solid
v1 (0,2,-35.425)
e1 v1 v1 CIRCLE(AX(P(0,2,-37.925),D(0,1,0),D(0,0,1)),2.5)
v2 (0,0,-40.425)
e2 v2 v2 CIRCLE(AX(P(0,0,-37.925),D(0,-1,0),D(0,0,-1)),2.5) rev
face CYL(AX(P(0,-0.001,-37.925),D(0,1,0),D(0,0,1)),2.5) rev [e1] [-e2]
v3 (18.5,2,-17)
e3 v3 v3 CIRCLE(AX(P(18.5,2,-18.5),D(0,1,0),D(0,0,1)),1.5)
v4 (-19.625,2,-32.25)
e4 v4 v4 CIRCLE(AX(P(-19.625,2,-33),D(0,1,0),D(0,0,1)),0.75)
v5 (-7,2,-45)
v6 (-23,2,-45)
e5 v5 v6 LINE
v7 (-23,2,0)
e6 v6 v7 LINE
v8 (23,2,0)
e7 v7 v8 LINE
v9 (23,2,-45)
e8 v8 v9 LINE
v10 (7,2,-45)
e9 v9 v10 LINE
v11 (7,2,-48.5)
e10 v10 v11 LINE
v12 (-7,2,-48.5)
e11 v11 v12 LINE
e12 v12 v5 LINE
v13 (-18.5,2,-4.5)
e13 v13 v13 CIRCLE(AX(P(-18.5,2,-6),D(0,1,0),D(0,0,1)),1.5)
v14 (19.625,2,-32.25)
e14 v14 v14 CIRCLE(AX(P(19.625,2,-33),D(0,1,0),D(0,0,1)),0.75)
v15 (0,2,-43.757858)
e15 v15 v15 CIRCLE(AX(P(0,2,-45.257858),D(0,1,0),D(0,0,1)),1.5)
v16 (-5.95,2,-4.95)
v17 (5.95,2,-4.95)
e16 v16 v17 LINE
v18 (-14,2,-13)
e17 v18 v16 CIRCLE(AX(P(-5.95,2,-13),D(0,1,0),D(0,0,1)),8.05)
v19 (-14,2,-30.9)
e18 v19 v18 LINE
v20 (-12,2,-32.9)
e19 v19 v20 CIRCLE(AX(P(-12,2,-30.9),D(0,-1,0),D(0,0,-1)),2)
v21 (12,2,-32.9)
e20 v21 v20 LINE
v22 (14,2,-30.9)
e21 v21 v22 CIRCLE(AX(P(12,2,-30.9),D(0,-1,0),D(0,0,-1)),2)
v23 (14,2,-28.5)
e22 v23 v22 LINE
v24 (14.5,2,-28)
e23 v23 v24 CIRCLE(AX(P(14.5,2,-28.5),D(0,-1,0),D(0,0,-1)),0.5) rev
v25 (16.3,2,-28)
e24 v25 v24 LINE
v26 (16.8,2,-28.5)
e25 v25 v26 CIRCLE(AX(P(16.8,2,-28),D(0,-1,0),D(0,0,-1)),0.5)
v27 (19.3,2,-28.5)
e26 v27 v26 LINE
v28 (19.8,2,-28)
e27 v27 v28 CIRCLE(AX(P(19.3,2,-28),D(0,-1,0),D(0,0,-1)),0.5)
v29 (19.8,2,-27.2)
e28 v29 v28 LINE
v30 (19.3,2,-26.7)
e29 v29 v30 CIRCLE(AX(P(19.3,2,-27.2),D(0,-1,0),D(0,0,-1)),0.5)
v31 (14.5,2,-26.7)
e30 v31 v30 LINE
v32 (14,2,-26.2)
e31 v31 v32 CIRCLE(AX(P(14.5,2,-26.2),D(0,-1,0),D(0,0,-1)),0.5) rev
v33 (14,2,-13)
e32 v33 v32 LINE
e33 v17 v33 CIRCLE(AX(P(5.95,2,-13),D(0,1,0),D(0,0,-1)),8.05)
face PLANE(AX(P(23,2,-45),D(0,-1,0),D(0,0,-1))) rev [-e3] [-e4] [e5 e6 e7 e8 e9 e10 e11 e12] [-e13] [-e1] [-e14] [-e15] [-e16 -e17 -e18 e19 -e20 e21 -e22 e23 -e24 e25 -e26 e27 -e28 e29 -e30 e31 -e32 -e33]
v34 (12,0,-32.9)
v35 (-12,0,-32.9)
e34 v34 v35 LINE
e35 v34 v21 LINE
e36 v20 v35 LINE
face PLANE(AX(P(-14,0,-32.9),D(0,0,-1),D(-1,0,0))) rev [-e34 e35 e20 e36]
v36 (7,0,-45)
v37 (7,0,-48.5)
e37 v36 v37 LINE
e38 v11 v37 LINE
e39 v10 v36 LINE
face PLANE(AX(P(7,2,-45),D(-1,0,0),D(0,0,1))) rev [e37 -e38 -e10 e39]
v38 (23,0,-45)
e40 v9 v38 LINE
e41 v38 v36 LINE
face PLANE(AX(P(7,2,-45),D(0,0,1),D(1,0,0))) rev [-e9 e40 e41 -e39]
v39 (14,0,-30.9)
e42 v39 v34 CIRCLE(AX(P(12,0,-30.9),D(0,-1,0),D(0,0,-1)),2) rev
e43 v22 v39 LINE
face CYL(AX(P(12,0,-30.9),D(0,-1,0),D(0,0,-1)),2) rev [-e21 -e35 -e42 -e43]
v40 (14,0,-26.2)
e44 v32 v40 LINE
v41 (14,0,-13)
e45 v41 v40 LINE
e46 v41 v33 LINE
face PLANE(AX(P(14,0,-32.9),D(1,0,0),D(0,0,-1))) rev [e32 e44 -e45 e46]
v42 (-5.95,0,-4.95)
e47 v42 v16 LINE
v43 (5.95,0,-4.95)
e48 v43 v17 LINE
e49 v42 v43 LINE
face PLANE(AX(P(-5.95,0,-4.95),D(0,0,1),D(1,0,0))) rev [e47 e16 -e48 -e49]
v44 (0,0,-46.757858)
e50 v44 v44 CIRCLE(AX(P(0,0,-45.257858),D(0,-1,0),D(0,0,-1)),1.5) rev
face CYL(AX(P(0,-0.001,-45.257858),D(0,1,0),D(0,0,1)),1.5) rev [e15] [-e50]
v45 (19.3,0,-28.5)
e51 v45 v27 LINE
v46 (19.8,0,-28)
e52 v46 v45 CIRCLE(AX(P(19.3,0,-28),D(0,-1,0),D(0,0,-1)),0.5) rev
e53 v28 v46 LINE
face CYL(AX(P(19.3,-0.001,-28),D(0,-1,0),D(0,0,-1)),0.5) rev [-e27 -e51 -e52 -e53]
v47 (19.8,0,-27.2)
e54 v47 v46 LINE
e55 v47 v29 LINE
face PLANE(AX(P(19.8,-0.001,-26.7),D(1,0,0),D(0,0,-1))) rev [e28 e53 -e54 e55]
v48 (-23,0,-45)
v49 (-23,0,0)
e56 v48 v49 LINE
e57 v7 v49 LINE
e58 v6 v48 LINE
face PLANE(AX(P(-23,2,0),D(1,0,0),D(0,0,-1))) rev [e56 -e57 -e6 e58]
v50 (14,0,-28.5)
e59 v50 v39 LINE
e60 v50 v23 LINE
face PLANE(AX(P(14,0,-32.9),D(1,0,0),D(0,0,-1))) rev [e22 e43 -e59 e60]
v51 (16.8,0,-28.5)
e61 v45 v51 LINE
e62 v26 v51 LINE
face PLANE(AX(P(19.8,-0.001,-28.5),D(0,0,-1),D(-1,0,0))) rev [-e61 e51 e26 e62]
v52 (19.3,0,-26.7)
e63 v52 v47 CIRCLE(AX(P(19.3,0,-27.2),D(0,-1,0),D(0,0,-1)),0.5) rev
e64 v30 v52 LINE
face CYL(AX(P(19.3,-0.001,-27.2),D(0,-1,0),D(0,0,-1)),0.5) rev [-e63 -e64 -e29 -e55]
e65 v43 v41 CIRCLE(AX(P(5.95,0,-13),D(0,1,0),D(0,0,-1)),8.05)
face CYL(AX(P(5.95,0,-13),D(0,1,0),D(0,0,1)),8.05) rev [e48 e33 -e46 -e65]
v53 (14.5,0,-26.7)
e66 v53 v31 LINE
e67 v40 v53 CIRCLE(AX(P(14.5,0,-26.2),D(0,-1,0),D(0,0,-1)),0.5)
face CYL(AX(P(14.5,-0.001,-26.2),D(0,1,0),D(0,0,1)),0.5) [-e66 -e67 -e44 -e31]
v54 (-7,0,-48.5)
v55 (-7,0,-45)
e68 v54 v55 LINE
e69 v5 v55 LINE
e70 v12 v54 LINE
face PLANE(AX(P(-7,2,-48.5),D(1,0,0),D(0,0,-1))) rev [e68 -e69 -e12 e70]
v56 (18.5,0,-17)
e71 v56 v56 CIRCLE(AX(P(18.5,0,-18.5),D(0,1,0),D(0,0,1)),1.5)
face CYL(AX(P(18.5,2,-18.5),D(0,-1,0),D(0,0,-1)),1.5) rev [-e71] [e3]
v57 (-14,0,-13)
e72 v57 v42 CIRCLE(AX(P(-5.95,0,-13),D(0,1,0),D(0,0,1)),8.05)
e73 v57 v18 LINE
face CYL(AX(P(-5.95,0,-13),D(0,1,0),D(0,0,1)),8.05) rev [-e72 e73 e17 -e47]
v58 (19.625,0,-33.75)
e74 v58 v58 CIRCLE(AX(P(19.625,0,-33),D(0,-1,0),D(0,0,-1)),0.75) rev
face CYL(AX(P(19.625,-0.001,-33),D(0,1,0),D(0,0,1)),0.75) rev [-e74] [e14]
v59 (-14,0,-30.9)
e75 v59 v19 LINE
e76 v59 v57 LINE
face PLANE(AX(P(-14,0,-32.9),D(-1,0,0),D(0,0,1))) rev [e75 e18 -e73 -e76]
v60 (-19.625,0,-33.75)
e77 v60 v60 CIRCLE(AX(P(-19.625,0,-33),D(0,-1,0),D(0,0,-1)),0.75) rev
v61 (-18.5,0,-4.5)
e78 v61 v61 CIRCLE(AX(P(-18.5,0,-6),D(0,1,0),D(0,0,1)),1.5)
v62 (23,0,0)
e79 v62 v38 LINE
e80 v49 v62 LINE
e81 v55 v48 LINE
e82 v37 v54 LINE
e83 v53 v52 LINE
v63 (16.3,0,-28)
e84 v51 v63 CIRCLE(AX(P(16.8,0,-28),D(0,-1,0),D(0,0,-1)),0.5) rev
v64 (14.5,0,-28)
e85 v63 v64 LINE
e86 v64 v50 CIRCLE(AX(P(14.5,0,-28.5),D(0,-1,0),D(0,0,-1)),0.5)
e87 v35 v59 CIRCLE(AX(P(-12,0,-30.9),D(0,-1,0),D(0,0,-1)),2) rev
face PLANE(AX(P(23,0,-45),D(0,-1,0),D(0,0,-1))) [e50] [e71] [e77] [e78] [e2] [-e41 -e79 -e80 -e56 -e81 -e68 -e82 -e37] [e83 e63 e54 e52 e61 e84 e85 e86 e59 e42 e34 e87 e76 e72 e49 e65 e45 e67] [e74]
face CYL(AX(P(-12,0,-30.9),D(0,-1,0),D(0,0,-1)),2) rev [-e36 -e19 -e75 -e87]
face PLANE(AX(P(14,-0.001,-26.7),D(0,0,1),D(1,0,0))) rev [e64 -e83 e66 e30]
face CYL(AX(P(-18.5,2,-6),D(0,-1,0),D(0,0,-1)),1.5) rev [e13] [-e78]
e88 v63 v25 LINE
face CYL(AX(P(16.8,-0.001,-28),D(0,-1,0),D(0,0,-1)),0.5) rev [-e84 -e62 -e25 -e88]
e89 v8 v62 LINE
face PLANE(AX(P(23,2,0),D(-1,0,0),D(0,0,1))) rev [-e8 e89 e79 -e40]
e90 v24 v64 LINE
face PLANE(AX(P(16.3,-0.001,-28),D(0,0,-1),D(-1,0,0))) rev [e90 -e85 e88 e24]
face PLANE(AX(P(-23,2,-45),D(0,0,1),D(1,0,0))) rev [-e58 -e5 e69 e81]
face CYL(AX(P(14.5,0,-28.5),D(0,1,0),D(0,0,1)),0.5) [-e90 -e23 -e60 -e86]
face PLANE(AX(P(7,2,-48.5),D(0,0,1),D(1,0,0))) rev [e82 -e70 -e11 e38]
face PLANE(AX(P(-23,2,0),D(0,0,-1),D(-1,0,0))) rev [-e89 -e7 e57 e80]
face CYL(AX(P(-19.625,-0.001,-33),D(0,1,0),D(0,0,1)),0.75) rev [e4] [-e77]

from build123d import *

# Parameters (mm, degrees)
SKETCH1_R          = 1.5
EXTRUDE1_DEPTH     = 2
CUT_EXTRUDE1_DEPTH = 2
FILLET1_R          = 2
CUT_EXTRUDE3_REACH = 55.715
SKETCH3_R          = 1.5
SKETCH3_R_2        = 0.75
SKETCH3_R_3        = 2.5
CUT_EXTRUDE4_REACH = 55.715
FILLET2_R          = 0.5


with BuildPart() as part:
    # Sketch1 → Extrude1 (new body)
    with BuildSketch(Plane(origin=(0, 0, 0), x_dir=(1, 0, 0), z_dir=(0, 1, 0))):
        Polygon((-23, 0), (23, 0), (23, 45), (7, 45), (7, 48.5), (-7, 48.5), (-7, 45), (-23, 45), align=None)
        with Locations(Location((-18.5, 6, 0), (0, 0, 270))):
            Circle(SKETCH1_R, mode=Mode.SUBTRACT)
        with Locations(Location((18.5, 18.5, 0), (0, 0, 270))):
            Circle(SKETCH1_R, mode=Mode.SUBTRACT)
    extrude(amount=EXTRUDE1_DEPTH)

    # Sketch2 → Cut-Extrude1 (cut)
    with BuildSketch(Plane(origin=(0, 2, 0), x_dir=(1, 0, 0), z_dir=(0, 1, 0))):
        with BuildLine():
            Line((-5.95, 4.95), (5.95, 4.95))
            ThreePointArc((5.95, 4.95), (11.642209589, 7.307790411), (14, 13))
            Line((14, 13), (14, 32.9))
            Line((14, 32.9), (-14, 32.9))
            Line((-14, 32.9), (-14, 13))
            ThreePointArc((-14, 13), (-11.642209589, 7.307790411), (-5.95, 4.95))
        make_face()
    extrude(amount=-CUT_EXTRUDE1_DEPTH, mode=Mode.SUBTRACT)

    # Fillet1
    fillet1_edges = [part.edges().sort_by_distance(p)[0] for p in [
        (-14, 1, -32.9),
        (14, 1, -32.9),
    ]]
    fillet(fillet1_edges, radius=FILLET1_R)

    # Sketch3 → Cut-Extrude3 (cut, up to next)
    with BuildSketch(Plane(origin=(0, 2, 0), x_dir=(1, 0, 0), z_dir=(0, 1, 0)), mode=Mode.PRIVATE) as cut_extrude3_sk1:
        with Locations(Location((0, 45.257858412, 0), (0, 0, 270))):
            Circle(SKETCH3_R)
    cut_extrude3_tool1 = extrude(cut_extrude3_sk1.sketch, amount=-CUT_EXTRUDE3_REACH, mode=Mode.PRIVATE) & part.part
    # Sketch3 → Cut-Extrude3 (cut, up to next)
    with BuildSketch(Plane(origin=(0, 2, 0), x_dir=(1, 0, 0), z_dir=(0, 1, 0)), mode=Mode.PRIVATE) as cut_extrude3_sk2:
        with Locations(Location((-19.625, 33, 0), (0, 0, 270))):
            Circle(SKETCH3_R_2)
    cut_extrude3_tool2 = extrude(cut_extrude3_sk2.sketch, amount=-CUT_EXTRUDE3_REACH, mode=Mode.PRIVATE) & part.part
    # Sketch3 → Cut-Extrude3 (cut, up to next)
    with BuildSketch(Plane(origin=(0, 2, 0), x_dir=(1, 0, 0), z_dir=(0, 1, 0)), mode=Mode.PRIVATE) as cut_extrude3_sk3:
        with Locations(Location((19.625, 33, 0), (0, 0, 270))):
            Circle(SKETCH3_R_2)
    cut_extrude3_tool3 = extrude(cut_extrude3_sk3.sketch, amount=-CUT_EXTRUDE3_REACH, mode=Mode.PRIVATE) & part.part
    # Sketch3 → Cut-Extrude3 (cut, up to next)
    with BuildSketch(Plane(origin=(0, 2, 0), x_dir=(1, 0, 0), z_dir=(0, 1, 0)), mode=Mode.PRIVATE) as cut_extrude3_sk4:
        with Locations(Location((0, 37.925, 0), (0, 0, 270))):
            Circle(SKETCH3_R_3)
    cut_extrude3_tool4 = extrude(cut_extrude3_sk4.sketch, amount=-CUT_EXTRUDE3_REACH, mode=Mode.PRIVATE) & part.part
    add(cut_extrude3_tool1.solids().sort_by_distance((0, 2, -45.257858))[0], mode=Mode.SUBTRACT)
    add(cut_extrude3_tool2.solids().sort_by_distance((-19.625, 2, -33))[0], mode=Mode.SUBTRACT)
    add(cut_extrude3_tool3.solids().sort_by_distance((19.625, 2, -33))[0], mode=Mode.SUBTRACT)
    add(cut_extrude3_tool4.solids().sort_by_distance((0, 2, -37.925))[0], mode=Mode.SUBTRACT)

    # Sketch10 → Cut-Extrude4 (cut, up to next)
    with BuildSketch(Plane(origin=(0, 2, 0), x_dir=(1, 0, 0), z_dir=(0, 1, 0)), mode=Mode.PRIVATE) as cut_extrude4_sk1:
        Polygon((14, 26.7), (19.8, 26.7), (19.8, 28.5), (16.3, 28.5), (16.3, 28), (14, 28), align=None)
    cut_extrude4_tool1 = extrude(cut_extrude4_sk1.sketch, amount=-CUT_EXTRUDE4_REACH, mode=Mode.PRIVATE) & part.part
    add(cut_extrude4_tool1.solids().sort_by_distance((17.116631, 2, -27.519537))[0], mode=Mode.SUBTRACT)

    # Fillet2
    fillet2_edges = [part.edges().sort_by_distance(p)[0] for p in [
        (16.3, 1, -28.5),
        (19.8, 1, -28.5),
        (19.8, 1, -26.7),
        (14, 1, -28),
        (14, 1, -26.7),
    ]]
    fillet(fillet2_edges, radius=FILLET2_R - 0.0001)  # a hair under: the kernel refuses the full size


solid = part.part
